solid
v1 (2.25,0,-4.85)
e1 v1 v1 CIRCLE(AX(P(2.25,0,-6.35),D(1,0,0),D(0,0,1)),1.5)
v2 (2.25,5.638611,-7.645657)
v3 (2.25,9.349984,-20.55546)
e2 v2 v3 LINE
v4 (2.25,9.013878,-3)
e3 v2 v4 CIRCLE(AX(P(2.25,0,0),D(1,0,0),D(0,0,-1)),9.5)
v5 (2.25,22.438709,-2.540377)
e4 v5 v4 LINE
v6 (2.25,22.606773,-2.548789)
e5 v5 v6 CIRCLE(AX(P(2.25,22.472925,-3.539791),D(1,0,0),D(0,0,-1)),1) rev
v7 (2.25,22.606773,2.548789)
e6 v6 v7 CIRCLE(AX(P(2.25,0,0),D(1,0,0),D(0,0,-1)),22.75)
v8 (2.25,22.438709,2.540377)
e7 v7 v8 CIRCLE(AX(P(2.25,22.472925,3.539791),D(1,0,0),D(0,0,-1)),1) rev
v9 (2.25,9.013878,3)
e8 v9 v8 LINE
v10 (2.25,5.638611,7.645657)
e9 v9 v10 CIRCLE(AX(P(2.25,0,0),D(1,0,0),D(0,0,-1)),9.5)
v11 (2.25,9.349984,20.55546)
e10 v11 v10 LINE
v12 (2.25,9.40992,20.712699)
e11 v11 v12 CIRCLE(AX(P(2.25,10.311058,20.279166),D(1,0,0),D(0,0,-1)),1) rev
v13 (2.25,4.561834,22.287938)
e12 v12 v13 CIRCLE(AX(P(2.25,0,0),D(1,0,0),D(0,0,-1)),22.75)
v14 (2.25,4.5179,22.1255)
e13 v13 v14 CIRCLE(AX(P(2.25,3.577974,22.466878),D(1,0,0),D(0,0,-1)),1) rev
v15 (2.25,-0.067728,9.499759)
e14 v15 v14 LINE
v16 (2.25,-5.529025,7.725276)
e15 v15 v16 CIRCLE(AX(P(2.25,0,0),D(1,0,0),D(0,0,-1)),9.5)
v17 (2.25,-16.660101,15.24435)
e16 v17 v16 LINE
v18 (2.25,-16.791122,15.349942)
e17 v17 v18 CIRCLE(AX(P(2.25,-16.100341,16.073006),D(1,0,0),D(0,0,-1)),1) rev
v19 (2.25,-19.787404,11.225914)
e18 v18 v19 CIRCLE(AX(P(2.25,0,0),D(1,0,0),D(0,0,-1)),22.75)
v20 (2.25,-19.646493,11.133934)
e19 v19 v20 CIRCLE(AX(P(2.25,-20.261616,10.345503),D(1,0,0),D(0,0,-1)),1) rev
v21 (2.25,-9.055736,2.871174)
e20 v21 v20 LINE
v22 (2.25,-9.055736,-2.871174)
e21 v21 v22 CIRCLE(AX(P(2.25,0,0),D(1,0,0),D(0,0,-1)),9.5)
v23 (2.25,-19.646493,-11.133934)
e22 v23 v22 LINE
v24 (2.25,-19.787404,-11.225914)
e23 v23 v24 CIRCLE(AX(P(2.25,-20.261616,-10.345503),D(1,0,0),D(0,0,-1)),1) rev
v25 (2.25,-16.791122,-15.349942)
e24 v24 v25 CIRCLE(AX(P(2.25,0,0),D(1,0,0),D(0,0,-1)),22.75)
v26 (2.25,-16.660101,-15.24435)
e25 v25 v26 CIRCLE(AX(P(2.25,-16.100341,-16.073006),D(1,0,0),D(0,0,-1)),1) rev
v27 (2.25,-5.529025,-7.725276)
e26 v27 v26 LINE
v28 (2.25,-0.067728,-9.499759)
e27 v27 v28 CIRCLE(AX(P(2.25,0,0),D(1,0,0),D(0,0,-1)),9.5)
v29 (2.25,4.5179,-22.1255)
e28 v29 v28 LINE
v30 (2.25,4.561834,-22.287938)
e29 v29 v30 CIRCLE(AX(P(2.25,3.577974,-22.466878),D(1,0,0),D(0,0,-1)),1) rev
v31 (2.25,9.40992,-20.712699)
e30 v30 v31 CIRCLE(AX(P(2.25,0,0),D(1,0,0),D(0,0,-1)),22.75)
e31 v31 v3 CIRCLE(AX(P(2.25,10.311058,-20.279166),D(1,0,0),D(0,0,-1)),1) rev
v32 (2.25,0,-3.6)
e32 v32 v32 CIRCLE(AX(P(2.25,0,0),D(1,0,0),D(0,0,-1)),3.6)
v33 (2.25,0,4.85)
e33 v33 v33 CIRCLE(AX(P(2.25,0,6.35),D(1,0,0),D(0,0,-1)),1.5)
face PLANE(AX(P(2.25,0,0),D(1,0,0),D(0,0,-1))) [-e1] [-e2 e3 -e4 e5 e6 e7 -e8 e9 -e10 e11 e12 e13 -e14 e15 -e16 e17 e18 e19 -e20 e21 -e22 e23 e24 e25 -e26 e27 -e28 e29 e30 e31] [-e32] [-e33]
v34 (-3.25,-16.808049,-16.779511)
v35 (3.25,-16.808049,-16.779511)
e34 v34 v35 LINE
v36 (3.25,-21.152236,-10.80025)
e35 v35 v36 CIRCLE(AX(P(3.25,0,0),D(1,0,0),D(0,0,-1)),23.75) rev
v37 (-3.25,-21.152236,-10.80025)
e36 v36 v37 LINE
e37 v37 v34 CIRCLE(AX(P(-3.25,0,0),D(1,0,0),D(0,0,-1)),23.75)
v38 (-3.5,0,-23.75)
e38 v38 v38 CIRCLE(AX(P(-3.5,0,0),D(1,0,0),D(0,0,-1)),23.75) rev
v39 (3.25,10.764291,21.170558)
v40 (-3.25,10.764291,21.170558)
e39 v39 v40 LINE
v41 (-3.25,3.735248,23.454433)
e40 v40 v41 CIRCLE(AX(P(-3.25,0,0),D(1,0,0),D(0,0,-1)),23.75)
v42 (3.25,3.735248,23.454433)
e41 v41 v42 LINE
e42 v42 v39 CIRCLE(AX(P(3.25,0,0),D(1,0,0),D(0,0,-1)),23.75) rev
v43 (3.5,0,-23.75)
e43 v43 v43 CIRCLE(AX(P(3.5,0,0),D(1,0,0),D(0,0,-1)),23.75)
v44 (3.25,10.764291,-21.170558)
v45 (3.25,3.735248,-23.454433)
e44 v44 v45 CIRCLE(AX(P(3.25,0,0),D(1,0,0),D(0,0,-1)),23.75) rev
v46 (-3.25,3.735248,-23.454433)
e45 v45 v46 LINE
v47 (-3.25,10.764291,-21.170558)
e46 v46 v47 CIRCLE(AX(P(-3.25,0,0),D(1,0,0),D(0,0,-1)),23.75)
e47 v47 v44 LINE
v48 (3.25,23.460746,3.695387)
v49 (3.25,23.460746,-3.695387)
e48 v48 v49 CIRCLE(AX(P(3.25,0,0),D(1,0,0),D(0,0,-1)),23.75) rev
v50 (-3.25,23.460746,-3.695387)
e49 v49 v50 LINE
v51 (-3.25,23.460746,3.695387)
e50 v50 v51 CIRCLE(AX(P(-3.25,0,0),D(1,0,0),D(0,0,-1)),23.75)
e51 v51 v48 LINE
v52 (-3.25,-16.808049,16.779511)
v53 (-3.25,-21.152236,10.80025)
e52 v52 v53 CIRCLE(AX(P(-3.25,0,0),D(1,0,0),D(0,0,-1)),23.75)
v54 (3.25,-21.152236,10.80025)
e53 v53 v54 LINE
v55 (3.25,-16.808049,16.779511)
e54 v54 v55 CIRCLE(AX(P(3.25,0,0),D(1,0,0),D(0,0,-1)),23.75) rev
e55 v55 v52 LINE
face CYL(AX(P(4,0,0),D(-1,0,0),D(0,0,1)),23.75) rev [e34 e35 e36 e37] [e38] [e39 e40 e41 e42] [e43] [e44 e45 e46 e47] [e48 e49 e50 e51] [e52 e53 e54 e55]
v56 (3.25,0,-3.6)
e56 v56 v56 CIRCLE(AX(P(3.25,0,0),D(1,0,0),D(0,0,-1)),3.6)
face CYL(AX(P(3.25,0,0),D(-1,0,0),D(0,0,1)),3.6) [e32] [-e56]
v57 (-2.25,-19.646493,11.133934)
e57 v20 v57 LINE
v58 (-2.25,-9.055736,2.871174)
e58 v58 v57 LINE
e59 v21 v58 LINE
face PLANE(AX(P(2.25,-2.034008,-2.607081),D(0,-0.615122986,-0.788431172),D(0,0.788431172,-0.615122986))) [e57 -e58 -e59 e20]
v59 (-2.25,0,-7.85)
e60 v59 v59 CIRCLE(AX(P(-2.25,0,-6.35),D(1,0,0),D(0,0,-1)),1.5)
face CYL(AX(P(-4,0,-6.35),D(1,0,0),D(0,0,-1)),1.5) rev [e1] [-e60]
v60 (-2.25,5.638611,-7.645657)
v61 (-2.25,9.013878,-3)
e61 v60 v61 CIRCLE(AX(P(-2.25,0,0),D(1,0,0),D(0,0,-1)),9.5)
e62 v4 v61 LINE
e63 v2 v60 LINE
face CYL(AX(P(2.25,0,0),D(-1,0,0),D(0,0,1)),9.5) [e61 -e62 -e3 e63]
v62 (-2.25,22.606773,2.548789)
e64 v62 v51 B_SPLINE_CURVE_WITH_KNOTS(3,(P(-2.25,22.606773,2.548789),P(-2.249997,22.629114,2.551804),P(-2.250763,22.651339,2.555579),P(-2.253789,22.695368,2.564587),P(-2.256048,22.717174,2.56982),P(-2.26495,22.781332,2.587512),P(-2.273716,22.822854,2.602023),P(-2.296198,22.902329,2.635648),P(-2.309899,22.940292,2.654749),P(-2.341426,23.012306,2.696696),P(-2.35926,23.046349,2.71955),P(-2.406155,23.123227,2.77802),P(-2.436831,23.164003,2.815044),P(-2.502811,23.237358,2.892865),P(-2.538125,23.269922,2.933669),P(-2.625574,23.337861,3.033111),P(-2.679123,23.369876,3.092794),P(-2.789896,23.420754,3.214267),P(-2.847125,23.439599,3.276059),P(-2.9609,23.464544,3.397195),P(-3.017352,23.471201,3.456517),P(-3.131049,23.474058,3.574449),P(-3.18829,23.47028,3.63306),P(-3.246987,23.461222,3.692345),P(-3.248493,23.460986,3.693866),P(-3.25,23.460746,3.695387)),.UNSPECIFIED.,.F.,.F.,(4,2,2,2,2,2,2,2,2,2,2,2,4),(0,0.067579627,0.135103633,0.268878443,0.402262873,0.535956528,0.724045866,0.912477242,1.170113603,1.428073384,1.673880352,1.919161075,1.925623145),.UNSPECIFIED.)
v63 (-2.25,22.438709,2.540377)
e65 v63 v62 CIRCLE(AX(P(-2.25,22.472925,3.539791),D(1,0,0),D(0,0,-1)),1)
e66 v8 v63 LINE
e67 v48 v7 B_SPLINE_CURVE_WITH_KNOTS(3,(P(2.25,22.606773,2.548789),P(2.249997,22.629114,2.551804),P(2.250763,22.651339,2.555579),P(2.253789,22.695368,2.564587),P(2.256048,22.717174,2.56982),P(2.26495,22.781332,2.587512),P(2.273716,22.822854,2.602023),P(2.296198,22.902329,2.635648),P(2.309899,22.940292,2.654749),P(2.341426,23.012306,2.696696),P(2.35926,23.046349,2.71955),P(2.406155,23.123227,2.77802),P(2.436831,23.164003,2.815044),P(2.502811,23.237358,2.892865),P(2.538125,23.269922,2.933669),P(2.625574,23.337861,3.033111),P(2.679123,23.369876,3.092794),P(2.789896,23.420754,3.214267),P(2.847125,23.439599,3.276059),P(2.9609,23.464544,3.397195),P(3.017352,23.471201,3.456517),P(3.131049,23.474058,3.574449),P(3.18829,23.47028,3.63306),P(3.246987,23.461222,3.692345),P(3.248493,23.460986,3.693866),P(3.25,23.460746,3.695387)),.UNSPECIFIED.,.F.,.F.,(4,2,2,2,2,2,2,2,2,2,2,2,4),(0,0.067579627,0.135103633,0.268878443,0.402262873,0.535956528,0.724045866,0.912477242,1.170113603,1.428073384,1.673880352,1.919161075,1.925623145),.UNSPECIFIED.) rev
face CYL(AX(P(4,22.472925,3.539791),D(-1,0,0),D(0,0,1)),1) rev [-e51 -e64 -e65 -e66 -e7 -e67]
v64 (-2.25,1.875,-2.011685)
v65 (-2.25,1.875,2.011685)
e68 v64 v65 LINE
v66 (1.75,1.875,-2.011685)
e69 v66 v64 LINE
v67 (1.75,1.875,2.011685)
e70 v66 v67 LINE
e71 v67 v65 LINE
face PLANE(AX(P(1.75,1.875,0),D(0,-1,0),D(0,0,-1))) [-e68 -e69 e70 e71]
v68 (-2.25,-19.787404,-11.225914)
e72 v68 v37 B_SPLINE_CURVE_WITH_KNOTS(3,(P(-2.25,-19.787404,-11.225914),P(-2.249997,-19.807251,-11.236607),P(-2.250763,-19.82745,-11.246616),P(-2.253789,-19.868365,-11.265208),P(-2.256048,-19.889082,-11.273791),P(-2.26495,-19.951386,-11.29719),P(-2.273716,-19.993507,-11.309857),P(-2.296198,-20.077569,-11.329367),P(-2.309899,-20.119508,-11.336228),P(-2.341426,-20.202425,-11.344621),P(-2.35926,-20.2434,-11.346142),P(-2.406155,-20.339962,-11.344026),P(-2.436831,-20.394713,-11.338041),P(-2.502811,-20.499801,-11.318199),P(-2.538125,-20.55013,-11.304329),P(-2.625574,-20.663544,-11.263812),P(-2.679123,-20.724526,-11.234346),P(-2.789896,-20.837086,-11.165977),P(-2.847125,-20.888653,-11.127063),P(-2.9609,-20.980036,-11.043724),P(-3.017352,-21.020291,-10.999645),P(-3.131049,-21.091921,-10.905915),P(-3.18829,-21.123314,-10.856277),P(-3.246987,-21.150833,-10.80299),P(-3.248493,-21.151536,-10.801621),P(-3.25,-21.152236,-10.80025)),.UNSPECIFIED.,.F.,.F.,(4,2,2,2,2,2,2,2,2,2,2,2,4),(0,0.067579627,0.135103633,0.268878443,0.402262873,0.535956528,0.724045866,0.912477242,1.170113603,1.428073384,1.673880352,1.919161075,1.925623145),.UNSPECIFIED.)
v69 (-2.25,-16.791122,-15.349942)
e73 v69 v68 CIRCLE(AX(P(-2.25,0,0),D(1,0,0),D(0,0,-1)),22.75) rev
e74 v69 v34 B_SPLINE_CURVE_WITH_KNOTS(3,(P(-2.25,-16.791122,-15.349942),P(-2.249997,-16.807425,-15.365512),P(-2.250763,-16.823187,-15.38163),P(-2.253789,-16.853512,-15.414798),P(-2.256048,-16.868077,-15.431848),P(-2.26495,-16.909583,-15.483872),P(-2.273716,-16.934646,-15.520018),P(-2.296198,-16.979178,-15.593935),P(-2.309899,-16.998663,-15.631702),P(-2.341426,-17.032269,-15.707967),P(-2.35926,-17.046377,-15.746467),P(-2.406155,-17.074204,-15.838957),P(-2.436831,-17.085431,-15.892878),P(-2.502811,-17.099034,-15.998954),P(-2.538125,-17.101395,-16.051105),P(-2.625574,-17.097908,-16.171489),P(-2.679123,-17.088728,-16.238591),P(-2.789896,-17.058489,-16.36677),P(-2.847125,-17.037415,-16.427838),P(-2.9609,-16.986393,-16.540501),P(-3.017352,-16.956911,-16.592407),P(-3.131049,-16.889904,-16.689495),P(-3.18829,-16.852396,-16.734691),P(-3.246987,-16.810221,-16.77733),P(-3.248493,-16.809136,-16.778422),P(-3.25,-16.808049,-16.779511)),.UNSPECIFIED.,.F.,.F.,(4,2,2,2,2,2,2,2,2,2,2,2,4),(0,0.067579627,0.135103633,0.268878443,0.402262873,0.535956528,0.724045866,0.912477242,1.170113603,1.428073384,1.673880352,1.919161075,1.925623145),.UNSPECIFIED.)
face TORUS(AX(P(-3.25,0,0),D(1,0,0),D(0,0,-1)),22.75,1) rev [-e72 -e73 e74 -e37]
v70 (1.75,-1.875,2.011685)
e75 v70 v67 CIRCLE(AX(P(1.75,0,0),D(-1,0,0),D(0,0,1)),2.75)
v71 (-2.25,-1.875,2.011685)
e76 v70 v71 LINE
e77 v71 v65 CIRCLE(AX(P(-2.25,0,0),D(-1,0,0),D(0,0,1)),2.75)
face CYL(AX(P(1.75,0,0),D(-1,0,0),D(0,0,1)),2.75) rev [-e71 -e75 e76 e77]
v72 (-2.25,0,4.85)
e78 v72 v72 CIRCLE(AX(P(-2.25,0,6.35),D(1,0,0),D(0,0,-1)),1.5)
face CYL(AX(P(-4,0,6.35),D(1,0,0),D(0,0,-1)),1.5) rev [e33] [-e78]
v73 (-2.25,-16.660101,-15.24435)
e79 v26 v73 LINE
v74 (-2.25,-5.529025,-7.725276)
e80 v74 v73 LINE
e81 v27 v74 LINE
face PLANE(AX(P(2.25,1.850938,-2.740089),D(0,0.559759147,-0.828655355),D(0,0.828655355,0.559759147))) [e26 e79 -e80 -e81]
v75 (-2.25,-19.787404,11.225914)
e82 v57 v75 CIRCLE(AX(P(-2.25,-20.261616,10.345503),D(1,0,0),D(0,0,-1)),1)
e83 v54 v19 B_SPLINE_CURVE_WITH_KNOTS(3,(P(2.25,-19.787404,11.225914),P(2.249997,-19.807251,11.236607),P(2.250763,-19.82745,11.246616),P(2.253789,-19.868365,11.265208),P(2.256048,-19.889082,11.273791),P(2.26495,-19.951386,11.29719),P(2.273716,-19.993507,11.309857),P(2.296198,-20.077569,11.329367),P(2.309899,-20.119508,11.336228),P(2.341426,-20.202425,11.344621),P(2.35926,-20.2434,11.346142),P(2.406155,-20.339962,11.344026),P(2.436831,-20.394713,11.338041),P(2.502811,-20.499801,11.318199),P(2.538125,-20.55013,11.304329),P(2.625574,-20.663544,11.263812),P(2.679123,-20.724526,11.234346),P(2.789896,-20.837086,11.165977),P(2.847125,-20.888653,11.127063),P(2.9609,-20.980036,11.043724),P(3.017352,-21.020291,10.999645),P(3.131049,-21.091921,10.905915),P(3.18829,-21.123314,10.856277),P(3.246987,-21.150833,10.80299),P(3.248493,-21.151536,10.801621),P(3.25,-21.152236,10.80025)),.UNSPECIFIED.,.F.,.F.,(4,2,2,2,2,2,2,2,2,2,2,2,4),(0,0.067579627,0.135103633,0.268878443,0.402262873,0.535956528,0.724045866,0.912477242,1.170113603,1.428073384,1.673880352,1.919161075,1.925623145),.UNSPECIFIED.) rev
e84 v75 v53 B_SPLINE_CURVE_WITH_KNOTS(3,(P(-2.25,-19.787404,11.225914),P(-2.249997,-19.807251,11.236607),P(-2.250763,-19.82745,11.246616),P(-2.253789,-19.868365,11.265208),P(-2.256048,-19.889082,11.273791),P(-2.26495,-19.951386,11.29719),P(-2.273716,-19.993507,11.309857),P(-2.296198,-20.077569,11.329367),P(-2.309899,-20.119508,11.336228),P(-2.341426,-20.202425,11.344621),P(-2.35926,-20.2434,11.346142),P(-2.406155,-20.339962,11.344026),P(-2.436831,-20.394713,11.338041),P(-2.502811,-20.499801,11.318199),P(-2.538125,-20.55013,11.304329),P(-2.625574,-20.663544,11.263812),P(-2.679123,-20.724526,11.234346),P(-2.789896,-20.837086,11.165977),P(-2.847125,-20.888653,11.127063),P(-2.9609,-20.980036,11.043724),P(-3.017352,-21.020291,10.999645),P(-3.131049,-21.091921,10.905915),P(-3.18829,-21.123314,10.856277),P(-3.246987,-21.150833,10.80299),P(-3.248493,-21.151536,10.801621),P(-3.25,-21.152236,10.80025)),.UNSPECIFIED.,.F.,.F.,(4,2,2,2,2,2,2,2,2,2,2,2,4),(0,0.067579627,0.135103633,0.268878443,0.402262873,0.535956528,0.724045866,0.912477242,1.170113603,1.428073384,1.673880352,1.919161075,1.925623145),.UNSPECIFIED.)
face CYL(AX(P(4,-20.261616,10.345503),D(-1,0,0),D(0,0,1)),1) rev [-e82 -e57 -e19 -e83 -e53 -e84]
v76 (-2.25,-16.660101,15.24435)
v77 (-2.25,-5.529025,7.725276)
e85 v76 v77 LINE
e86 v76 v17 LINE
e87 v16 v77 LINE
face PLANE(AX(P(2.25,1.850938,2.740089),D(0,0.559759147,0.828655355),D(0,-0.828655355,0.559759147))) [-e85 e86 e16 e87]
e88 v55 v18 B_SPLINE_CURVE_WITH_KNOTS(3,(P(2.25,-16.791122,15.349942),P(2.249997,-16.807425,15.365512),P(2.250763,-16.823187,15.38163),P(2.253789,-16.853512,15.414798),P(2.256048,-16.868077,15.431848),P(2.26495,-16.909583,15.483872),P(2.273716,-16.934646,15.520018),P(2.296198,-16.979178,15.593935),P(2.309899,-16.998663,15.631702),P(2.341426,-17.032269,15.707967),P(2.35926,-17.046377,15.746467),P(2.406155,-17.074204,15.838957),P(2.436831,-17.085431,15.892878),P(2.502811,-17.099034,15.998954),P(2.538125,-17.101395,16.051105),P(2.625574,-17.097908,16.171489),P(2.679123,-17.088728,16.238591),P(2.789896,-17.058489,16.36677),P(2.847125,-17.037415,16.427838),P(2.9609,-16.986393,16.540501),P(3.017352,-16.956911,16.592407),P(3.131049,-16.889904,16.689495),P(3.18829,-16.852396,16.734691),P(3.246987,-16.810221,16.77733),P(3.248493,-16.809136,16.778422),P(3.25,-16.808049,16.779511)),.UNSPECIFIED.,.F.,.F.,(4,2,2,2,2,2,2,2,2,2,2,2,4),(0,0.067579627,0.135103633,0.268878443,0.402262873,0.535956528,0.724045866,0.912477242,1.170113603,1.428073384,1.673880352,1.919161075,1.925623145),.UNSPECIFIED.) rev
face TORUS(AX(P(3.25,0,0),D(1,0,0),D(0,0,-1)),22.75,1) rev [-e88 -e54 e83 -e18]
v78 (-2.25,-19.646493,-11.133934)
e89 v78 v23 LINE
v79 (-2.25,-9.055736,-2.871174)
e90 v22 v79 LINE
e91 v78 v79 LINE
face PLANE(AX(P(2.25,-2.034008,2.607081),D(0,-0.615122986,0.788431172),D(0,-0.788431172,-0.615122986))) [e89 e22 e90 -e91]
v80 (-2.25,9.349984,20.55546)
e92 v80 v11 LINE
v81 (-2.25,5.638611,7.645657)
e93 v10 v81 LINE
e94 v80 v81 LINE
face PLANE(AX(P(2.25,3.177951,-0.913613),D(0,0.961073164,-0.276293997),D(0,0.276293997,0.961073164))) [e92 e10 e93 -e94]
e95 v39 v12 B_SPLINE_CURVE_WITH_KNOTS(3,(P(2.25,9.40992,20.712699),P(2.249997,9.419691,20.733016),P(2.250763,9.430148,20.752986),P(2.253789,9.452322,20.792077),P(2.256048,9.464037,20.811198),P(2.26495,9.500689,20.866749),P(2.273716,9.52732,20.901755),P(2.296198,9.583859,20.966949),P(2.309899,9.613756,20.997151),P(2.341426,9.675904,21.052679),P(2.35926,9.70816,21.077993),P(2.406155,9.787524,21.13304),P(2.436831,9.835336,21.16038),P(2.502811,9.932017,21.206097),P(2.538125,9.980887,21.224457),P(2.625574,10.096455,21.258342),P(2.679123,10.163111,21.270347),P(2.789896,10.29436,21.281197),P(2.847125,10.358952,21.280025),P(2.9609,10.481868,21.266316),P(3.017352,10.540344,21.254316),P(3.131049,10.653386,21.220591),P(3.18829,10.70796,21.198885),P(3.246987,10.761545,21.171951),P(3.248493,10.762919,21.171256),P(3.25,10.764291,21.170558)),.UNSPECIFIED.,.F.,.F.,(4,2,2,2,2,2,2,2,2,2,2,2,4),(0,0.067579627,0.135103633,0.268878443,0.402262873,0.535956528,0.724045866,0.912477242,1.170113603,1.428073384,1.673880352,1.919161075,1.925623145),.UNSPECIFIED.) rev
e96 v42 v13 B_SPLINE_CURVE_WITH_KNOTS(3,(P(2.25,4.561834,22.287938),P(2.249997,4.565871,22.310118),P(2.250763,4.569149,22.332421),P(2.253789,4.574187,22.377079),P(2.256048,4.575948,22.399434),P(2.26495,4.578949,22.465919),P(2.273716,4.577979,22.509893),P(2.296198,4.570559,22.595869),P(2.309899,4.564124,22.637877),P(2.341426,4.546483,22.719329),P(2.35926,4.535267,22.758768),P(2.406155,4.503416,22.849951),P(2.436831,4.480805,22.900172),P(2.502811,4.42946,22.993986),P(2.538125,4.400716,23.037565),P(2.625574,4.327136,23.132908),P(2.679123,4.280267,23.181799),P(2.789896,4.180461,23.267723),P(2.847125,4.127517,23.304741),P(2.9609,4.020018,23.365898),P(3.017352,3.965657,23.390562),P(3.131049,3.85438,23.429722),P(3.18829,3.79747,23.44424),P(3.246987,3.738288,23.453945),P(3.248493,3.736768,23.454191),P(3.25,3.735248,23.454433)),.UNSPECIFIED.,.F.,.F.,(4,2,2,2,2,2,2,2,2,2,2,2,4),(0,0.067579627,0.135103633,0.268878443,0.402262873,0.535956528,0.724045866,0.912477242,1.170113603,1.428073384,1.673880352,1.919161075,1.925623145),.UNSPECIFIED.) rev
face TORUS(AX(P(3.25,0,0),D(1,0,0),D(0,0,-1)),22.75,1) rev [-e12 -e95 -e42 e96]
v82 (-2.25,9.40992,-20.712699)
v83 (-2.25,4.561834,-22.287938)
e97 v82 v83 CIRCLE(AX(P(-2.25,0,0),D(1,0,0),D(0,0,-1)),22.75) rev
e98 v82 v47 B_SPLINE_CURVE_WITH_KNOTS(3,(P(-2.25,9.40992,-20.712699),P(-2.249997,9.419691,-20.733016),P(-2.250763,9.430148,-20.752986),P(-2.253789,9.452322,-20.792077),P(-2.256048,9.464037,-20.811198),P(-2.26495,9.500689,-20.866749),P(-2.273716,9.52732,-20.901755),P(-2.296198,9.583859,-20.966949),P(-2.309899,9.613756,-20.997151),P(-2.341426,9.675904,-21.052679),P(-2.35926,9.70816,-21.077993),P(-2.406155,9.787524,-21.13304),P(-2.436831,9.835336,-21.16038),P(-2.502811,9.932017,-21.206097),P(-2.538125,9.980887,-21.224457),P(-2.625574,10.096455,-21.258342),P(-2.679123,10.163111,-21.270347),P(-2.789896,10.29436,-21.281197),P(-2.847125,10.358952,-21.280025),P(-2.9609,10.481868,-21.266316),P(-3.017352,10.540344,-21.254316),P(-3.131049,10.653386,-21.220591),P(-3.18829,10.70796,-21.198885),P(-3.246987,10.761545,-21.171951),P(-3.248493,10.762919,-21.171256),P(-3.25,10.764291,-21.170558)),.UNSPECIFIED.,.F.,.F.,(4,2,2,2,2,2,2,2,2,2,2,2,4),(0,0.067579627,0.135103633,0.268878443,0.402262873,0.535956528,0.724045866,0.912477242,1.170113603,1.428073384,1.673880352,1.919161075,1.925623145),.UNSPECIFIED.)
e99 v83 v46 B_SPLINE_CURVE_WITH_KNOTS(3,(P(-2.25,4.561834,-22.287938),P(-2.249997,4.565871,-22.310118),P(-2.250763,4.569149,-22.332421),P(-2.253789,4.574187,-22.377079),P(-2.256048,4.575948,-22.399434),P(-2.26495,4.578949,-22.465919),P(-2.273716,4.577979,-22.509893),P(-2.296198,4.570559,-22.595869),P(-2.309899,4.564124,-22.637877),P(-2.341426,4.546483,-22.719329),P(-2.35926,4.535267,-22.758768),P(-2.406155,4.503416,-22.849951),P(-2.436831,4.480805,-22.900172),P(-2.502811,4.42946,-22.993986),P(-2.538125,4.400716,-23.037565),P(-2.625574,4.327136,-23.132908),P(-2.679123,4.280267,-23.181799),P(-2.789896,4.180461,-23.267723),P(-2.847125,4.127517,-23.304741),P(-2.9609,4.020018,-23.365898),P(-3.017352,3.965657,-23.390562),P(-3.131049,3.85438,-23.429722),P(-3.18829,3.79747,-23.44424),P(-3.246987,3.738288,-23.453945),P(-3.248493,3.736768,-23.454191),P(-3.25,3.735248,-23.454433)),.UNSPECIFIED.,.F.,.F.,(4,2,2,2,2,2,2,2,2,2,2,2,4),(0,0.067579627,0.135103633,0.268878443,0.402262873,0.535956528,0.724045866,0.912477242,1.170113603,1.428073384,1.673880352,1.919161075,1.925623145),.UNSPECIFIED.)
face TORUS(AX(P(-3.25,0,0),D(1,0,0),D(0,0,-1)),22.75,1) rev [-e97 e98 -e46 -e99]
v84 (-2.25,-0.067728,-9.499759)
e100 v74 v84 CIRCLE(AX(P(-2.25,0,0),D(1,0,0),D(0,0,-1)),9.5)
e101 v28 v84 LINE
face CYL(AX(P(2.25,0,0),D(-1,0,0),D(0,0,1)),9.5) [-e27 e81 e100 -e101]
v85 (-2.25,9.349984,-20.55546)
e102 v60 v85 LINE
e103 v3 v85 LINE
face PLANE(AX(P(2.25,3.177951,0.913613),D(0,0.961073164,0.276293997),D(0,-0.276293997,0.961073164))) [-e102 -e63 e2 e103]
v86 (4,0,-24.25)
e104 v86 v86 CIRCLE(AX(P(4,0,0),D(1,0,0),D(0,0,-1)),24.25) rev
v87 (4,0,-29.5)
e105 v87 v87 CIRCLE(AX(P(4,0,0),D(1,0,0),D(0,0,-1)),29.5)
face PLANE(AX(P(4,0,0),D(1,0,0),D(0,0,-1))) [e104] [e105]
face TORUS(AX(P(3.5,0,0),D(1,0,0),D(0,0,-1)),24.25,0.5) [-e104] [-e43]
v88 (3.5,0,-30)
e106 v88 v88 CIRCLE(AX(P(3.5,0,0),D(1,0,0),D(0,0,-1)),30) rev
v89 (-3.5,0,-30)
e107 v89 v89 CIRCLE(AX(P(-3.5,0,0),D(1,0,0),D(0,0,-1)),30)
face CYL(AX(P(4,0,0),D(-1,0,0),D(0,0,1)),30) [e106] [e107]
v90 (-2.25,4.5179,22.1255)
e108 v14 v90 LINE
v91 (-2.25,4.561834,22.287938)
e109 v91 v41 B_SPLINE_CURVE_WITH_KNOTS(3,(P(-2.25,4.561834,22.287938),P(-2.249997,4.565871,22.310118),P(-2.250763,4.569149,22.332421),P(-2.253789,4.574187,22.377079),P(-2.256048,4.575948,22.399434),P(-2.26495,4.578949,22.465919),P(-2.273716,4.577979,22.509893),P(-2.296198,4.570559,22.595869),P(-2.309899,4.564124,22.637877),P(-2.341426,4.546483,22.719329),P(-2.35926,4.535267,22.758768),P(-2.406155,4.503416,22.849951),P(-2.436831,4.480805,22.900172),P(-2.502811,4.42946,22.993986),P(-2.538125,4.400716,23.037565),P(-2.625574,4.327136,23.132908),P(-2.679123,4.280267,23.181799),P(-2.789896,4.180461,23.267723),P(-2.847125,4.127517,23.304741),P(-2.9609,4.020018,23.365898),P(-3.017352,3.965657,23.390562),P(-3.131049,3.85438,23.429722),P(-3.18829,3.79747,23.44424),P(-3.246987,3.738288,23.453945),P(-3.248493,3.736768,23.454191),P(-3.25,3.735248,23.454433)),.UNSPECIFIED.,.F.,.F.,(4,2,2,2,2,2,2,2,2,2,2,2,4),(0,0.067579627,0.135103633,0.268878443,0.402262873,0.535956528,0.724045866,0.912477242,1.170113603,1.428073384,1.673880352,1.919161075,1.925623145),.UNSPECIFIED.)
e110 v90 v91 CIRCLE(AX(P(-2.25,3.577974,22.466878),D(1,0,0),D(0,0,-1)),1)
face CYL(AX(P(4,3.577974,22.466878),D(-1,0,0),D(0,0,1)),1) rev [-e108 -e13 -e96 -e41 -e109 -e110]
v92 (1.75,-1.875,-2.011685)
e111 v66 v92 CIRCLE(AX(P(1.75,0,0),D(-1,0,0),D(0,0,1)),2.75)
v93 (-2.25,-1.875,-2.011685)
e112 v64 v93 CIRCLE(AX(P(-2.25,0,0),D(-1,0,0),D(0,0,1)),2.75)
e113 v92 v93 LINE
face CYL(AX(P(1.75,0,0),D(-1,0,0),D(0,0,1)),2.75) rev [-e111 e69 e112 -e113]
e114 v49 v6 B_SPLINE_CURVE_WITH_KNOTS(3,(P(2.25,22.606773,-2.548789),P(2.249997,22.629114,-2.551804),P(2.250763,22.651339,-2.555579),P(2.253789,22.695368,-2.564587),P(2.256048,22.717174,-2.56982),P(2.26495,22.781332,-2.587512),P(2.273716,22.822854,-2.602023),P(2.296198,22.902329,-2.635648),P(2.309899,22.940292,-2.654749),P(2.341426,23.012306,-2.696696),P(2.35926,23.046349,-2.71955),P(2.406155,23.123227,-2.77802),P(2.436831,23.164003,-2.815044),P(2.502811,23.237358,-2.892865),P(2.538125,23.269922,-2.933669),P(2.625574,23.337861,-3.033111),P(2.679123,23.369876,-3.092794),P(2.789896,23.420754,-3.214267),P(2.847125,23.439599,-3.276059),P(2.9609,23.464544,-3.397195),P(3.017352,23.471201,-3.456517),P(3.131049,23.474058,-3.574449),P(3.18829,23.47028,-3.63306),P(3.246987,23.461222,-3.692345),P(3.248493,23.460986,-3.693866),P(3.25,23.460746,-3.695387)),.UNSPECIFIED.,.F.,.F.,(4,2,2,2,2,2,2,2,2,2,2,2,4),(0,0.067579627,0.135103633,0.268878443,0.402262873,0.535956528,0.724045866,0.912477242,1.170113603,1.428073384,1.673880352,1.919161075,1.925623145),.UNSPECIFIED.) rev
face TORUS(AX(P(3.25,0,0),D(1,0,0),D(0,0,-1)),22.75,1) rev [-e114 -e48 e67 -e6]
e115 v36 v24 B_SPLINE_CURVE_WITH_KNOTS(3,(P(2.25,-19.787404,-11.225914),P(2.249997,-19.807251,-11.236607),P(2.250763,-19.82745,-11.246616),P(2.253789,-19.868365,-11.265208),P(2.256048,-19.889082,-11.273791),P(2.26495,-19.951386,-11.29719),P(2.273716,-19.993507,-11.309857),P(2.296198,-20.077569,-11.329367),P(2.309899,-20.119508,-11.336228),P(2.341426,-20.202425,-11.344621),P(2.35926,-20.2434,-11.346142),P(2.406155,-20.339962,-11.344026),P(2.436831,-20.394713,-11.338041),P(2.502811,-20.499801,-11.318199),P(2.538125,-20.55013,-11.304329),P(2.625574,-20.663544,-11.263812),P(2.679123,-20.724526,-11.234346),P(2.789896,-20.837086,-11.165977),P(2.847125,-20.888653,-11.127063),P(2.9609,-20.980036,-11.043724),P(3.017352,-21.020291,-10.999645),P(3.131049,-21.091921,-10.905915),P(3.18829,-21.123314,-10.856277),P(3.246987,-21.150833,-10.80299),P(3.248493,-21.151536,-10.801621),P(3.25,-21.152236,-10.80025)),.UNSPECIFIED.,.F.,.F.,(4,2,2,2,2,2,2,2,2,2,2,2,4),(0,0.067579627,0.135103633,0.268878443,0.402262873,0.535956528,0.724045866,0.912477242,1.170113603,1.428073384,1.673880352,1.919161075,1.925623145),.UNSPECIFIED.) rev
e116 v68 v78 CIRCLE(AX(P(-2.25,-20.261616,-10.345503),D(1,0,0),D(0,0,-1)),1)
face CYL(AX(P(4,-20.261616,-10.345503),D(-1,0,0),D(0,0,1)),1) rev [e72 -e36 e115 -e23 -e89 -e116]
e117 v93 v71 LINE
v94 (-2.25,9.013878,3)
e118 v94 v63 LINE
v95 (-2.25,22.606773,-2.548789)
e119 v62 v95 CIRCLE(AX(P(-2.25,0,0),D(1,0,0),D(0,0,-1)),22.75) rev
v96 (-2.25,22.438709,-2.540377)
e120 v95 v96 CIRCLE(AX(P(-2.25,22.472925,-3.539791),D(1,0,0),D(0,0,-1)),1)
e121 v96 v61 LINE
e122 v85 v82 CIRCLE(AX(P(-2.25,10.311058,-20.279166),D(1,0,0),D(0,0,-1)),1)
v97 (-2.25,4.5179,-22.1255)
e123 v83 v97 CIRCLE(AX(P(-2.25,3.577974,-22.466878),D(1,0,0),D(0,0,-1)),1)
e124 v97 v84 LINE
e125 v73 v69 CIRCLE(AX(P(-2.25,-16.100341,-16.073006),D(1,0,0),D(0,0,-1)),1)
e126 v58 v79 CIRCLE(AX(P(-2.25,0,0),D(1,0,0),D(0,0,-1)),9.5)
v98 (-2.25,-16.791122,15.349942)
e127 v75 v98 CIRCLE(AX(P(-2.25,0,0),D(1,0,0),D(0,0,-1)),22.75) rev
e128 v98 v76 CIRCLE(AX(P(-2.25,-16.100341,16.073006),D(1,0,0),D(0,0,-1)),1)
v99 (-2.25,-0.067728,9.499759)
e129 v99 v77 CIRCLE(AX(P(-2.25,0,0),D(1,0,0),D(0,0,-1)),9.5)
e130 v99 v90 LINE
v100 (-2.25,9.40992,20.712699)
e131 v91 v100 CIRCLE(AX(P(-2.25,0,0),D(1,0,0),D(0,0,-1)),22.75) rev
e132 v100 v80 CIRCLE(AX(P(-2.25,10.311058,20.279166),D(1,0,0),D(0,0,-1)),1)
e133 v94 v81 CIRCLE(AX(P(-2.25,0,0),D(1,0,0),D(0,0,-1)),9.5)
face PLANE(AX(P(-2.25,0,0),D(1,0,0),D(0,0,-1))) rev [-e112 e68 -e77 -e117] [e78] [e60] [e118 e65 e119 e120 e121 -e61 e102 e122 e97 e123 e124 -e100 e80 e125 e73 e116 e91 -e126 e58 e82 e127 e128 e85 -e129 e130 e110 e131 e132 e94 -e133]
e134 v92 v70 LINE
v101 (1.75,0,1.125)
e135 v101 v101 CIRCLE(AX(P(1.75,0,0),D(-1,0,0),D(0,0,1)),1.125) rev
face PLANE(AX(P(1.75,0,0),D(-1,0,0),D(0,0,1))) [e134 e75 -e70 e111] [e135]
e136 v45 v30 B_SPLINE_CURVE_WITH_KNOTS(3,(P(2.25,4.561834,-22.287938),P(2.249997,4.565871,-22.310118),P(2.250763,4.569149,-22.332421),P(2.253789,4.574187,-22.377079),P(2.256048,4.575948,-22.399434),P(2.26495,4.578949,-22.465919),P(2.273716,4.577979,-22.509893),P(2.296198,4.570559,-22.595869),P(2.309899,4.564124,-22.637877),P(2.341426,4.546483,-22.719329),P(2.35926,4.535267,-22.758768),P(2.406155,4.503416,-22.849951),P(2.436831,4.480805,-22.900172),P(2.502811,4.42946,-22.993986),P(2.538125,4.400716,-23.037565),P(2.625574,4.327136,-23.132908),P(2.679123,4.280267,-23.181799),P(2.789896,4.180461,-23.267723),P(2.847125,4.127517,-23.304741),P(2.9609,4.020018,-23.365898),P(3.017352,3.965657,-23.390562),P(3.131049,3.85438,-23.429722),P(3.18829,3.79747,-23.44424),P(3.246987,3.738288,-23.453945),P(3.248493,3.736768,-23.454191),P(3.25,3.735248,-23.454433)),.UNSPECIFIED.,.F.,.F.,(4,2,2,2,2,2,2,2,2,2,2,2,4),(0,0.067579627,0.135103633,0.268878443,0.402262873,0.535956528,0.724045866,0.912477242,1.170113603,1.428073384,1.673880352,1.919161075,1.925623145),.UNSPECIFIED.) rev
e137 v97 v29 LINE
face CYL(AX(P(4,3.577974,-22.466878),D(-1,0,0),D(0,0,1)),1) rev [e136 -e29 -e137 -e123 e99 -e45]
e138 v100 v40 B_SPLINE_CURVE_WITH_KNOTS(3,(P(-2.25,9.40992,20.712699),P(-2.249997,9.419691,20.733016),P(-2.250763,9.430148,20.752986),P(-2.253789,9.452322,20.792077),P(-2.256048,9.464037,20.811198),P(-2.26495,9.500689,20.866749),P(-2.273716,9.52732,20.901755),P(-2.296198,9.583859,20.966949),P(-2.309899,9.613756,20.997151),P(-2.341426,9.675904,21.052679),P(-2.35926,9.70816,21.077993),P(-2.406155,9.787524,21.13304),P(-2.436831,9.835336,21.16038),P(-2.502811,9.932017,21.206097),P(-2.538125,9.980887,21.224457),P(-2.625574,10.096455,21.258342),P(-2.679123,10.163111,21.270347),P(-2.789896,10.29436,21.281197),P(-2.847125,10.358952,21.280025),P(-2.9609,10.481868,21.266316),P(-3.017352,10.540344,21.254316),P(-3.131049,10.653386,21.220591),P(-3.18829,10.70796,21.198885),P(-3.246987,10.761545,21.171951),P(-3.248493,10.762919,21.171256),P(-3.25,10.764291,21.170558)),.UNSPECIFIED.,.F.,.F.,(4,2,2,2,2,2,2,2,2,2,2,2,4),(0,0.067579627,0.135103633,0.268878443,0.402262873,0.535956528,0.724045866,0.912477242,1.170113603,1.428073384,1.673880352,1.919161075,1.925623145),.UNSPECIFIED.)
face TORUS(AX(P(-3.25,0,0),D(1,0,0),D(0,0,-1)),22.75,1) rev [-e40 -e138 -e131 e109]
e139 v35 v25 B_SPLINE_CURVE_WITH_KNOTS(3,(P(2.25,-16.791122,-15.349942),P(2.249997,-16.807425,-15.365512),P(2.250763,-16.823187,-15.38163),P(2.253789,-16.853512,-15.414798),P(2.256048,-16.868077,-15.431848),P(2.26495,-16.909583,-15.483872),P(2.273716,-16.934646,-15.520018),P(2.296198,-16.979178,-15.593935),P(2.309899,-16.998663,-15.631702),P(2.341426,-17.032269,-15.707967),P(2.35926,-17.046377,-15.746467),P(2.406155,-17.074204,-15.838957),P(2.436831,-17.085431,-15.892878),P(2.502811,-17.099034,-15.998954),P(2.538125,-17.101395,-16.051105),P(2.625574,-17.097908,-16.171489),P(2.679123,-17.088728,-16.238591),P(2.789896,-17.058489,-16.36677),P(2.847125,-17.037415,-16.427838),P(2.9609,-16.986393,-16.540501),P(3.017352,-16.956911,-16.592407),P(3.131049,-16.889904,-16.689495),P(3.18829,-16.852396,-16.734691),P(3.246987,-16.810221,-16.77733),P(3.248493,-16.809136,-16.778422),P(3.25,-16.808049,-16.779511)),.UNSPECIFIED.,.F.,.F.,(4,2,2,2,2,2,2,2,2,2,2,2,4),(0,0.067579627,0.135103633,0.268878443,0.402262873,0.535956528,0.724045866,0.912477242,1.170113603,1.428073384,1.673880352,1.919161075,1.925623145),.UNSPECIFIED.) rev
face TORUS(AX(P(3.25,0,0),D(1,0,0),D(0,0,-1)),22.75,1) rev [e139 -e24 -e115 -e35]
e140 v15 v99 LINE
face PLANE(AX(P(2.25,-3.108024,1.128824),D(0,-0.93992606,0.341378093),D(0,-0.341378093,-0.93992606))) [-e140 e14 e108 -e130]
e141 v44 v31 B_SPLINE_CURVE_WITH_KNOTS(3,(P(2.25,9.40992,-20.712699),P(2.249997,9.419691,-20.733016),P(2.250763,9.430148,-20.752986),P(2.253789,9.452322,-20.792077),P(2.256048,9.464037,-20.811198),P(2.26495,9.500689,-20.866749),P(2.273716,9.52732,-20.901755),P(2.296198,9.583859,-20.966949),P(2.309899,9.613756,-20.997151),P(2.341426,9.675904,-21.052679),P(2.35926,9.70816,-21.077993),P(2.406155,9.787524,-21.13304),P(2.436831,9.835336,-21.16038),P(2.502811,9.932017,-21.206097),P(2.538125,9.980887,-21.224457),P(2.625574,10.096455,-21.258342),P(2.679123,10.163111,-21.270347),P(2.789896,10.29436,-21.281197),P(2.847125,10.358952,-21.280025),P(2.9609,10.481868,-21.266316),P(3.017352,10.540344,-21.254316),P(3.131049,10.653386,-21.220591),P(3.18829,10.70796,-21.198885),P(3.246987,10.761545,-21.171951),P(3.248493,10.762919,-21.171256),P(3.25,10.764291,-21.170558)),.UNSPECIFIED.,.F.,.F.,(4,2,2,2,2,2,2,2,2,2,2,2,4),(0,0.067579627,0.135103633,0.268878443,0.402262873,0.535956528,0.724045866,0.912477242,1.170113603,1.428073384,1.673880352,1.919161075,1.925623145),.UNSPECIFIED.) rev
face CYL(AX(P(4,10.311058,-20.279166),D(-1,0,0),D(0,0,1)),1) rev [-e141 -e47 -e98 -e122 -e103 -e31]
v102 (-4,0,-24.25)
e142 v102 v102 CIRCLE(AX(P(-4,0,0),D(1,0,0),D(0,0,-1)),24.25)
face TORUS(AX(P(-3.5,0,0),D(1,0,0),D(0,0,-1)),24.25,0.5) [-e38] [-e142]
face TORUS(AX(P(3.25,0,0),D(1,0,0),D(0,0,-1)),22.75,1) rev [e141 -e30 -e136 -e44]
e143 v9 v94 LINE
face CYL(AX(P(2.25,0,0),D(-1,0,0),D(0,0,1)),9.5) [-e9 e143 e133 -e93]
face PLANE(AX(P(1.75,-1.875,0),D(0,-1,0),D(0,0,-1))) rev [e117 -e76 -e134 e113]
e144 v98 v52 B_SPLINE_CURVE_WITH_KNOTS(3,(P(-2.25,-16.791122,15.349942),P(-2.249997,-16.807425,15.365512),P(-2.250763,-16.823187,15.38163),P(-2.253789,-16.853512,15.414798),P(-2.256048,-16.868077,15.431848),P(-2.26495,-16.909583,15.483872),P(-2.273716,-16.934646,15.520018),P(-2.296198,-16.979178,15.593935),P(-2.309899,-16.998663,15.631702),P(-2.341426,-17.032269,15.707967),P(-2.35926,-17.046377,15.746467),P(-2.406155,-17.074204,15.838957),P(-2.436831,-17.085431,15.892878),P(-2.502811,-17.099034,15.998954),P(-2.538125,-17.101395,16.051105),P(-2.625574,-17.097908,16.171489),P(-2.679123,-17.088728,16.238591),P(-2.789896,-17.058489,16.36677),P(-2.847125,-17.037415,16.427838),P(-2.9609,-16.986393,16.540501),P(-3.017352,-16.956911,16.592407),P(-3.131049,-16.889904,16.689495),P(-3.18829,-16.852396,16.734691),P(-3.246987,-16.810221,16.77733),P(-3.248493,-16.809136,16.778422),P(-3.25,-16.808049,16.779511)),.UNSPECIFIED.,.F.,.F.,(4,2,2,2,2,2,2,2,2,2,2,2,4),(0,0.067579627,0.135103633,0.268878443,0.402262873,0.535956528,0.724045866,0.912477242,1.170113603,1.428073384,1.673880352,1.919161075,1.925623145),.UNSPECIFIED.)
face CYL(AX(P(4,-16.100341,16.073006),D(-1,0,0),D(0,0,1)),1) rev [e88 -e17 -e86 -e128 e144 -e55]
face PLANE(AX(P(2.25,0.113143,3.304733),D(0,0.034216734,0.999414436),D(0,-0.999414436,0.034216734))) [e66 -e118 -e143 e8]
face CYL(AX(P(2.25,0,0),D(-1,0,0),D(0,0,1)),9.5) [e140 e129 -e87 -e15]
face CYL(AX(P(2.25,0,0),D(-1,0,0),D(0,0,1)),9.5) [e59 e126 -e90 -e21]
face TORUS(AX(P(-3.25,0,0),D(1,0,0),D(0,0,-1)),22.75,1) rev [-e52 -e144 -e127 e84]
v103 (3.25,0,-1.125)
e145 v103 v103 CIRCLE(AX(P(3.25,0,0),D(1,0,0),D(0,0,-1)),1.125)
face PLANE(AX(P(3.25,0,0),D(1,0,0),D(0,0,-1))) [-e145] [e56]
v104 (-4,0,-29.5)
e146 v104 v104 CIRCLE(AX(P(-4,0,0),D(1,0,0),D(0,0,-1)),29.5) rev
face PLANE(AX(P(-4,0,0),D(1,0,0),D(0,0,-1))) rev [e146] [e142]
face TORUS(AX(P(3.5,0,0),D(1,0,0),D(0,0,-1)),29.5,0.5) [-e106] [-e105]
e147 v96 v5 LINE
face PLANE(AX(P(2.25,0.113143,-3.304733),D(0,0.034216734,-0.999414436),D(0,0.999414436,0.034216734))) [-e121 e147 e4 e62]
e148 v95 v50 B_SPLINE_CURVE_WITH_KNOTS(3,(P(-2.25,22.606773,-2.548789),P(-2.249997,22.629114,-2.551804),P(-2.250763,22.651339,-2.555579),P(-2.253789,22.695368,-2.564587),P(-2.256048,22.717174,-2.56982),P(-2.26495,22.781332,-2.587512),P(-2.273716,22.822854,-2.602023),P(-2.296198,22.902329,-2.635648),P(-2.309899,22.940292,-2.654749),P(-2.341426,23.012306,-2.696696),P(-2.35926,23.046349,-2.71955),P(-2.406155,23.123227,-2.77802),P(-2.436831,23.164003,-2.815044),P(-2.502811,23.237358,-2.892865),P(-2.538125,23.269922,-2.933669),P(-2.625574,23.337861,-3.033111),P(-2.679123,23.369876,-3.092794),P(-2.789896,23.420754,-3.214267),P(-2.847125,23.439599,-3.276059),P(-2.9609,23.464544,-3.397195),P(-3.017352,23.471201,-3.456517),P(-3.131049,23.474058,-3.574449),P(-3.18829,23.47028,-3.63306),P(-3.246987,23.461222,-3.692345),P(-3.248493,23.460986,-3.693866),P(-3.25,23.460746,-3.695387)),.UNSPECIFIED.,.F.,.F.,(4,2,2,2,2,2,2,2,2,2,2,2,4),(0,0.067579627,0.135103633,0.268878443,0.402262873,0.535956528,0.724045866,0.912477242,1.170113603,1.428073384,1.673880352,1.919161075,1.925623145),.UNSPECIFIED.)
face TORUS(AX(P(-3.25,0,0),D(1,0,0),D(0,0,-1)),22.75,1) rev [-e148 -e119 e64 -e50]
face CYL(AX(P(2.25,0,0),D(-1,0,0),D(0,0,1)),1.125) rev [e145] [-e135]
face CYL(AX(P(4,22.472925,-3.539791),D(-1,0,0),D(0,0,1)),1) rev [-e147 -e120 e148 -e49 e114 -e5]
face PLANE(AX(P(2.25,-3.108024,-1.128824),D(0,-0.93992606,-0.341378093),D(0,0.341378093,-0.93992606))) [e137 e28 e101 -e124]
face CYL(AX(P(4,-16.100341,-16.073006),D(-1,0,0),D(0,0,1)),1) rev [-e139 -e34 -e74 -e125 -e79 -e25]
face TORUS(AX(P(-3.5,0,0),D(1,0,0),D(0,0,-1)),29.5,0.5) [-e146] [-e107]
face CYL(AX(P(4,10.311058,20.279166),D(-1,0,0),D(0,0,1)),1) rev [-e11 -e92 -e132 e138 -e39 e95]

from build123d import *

# Parameters (mm, degrees)
SKETCH1_R           = 30
SKETCH1_R_2         = 23.75
BOSS_EXTRUDE1_DEPTH = 4
SKETCH3_R           = 9.5
SKETCH3_R_2         = 1.125
BOSS_EXTRUDE2_DEPTH = 2.25
FILLET1_R           = 1
CIRPATTERN1_START   = -3.2500001
CIRPATTERN1_DEPTH   = 6.5000002
SKETCH4_R           = 3.6
SKETCH4_R_2         = 1.125
BOSS_EXTRUDE3_DEPTH = 1
SKETCH5_R           = 1.5
CUT_EXTRUDE1_DEPTH  = 43.884291996
CIRPATTERN2_COUNT   = 2
SKETCH6_R           = 1.125
CUT_EXTRUDE2_DEPTH  = 4
FILLET2_R           = 0.5


with BuildPart() as part:
    # Sketch1 → Boss-Extrude1 (new, symmetric)
    with BuildSketch(Plane(origin=(0, 0, 0), x_dir=(0, 0, -1), z_dir=(1, 0, 0))):
        Circle(SKETCH1_R)
        Circle(SKETCH1_R_2, mode=Mode.SUBTRACT)
    extrude(amount=BOSS_EXTRUDE1_DEPTH, both=True)

    # Sketch3 → Boss-Extrude2 (add, symmetric)
    # profile 1 of 2: a face of its own
    with BuildSketch(Plane(origin=(0, 0, 0), x_dir=(0, 0, -1), z_dir=(1, 0, 0))):
        Circle(SKETCH3_R)
        Circle(SKETCH3_R_2, mode=Mode.SUBTRACT)
    # profile 2 of 2: a face of its own
    with BuildSketch(Plane(origin=(0, 0, 0), x_dir=(0, 0, -1), z_dir=(1, 0, 0))):
        with BuildLine():
            Line((-2.5, 23.618054535), (-3, 9.013878189))
            ThreePointArc((-3, 9.013878189), (0, 9.5), (3, 9.013878189))
            Line((3, 9.013878189), (2.5, 23.618054535))
            ThreePointArc((2.5, 23.618054535), (0, 23.75), (-2.5, 23.618054535))
        make_face()
    extrude(amount=BOSS_EXTRUDE2_DEPTH, both=True)

    # Fillet1
    # the kernel refuses this fillet: 1 mm, written as the material it adds along each edge
    with BuildSketch(Plane(origin=(2.25, 0, 0), x_dir=(0, 0.9778800585979858, -0.2091664193803582), z_dir=(0, -0.2091664193803582, -0.9778800585979858))) as fillet1_piece_1_section:
        with BuildLine():
            CenterArc((23.75 - FILLET1_R, FILLET1_R), FILLET1_R, 270, 90)
            Line((23.75 - FILLET1_R, 0), (23.75, 0))
            Line((23.75, 0), (23.75, FILLET1_R))
        make_face()
    fillet1_piece_1 = revolve(axis=Axis((2.25, 0, 0), (1, 0, 0)), revolution_arc=24.147013547, mode=Mode.PRIVATE)
    fillet1_piece_1 = split(fillet1_piece_1, bisect_by=Plane(origin=(2.25, 0.113143406, -3.304732515), z_dir=(0, -0.03421673405052404, 0.9994144361129249)), keep=Keep.TOP, mode=Mode.PRIVATE)
    fillet1_piece_1 = split(fillet1_piece_1, bisect_by=Plane(origin=(2.25, 0.113143406, 3.304732515), z_dir=(0, -0.03421673405052404, -0.9994144361129249)), keep=Keep.TOP, mode=Mode.PRIVATE)
    add(fillet1_piece_1)
    with BuildSketch(Plane(origin=(2.25, 23.618054535, -2.5), x_dir=(0, -0.13047123096448623, -0.9914520956105806), z_dir=(-1, 0, 0)), Plane(origin=(-2.25, 23.618054535, 2.5), x_dir=(0, -0.13047123096448424, 0.9914520956105807), z_dir=(1, 0, 0))) as fillet1_piece_2:
        with BuildLine():
            CenterArc((1.180309811, 0.9996778), FILLET1_R, 170.542319009, 100.912176362)
            Line((0.193902574, 1.163996884), (0, 0))
            ThreePointArc((0, 0), (0.602846409, -0.00765226), (1.205692818, 0))
        make_face()
    extrude(amount=4.5)
    with BuildSketch(Plane(origin=(-2.25, 0, 0), x_dir=(0, 0.9778800585979858, -0.2091664193803582), z_dir=(0, -0.2091664193803582, -0.9778800585979858))) as fillet1_piece_3_section:
        with BuildLine():
            CenterArc((23.75 - FILLET1_R, -FILLET1_R), FILLET1_R, 0, 90)
            Line((23.75 - FILLET1_R, 0), (23.75, 0))
            Line((23.75, 0), (23.75, -FILLET1_R))
        make_face()
    fillet1_piece_3 = revolve(axis=Axis((-2.25, 0, 0), (1, 0, 0)), revolution_arc=24.147013547, mode=Mode.PRIVATE)
    fillet1_piece_3 = split(fillet1_piece_3, bisect_by=Plane(origin=(-2.25, 0.113143406, 3.304732515), z_dir=(0, -0.03421673405052404, -0.9994144361129249)), keep=Keep.TOP, mode=Mode.PRIVATE)
    fillet1_piece_3 = split(fillet1_piece_3, bisect_by=Plane(origin=(-2.25, 0.113143406, -3.304732515), z_dir=(0, -0.03421673405052404, 0.9994144361129249)), keep=Keep.TOP, mode=Mode.PRIVATE)
    add(fillet1_piece_3)
    with BuildSketch(Plane(origin=(2.25, 0, 0), x_dir=(0, 0.9778800585979858, -0.2091664193803582), z_dir=(0, -0.2091664193803582, -0.9778800585979858))) as fillet1_piece_4a_section:
        with BuildLine():
            CenterArc((23.75 - FILLET1_R, FILLET1_R), FILLET1_R, 270, 90)
            Line((23.75 - FILLET1_R, 0), (23.75, 0))
            Line((23.75, 0), (23.75, FILLET1_R))
        make_face()
    fillet1_piece_4a = revolve(axis=Axis((2.25, 0, 0), (1, 0, 0)), revolution_arc=24.147013547, mode=Mode.PRIVATE)
    fillet1_piece_4a = split(fillet1_piece_4a, bisect_by=Plane(origin=(2.25, 0.113143406, -3.304732515), z_dir=(0, 0.03421673405052404, -0.9994144361129249)), keep=Keep.TOP, mode=Mode.PRIVATE)
    with BuildSketch(Plane(origin=(5.264232045, 23.618054535, -2.5), x_dir=(0, -0.13047123096448623, -0.9914520956105806), z_dir=(-1, 0, 0))) as fillet1_piece_4b_section:
        with BuildLine():
            CenterArc((1.180309811, 0.9996778), FILLET1_R, 170.542319009, 100.912176362)
            Line((0.193902574, 1.163996884), (0, 0))
            ThreePointArc((0, 0), (0.602846409, -0.00765226), (1.205692818, 0))
        make_face()
    fillet1_piece_4b = extrude(amount=7.514232045, mode=Mode.PRIVATE)
    fillet1_piece_4b = split(fillet1_piece_4b, bisect_by=Plane(origin=(4, 23.618054535, -2.5), z_dir=(-1, 0, 0)), keep=Keep.TOP, mode=Mode.PRIVATE)
    fillet1_piece_4b = split(fillet1_piece_4b, bisect_by=Plane(origin=(2.25, 23.618054535, -2.5), z_dir=(1, 0, 0)), keep=Keep.TOP, mode=Mode.PRIVATE)
    fillet1_piece_4 = fillet1_piece_4a & fillet1_piece_4b
    add(fillet1_piece_4)
    with BuildSketch(Plane(origin=(2.25, 0, 0), x_dir=(0, 0.9778800585979858, -0.2091664193803582), z_dir=(0, -0.2091664193803582, -0.9778800585979858))) as fillet1_piece_5a_section:
        with BuildLine():
            CenterArc((23.75 - FILLET1_R, FILLET1_R), FILLET1_R, 270, 90)
            Line((23.75 - FILLET1_R, 0), (23.75, 0))
            Line((23.75, 0), (23.75, FILLET1_R))
        make_face()
    fillet1_piece_5a = revolve(axis=Axis((2.25, 0, 0), (1, 0, 0)), revolution_arc=24.147013547, mode=Mode.PRIVATE)
    fillet1_piece_5a = split(fillet1_piece_5a, bisect_by=Plane(origin=(2.25, 0.113143406, 3.304732515), z_dir=(0, 0.03421673405052404, 0.9994144361129249)), keep=Keep.TOP, mode=Mode.PRIVATE)
    with BuildSketch(Plane(origin=(-2.25, 23.618054535, 2.5), x_dir=(0, -0.13047123096448424, 0.9914520956105807), z_dir=(1, 0, 0))) as fillet1_piece_5b_section:
        with BuildLine():
            CenterArc((1.180309811, 0.9996778), FILLET1_R, 170.542319009, 100.912176362)
            Line((0.193902574, 1.163996884), (0, 0))
            ThreePointArc((0, 0), (0.602846409, -0.00765226), (1.205692818, 0))
        make_face()
    fillet1_piece_5b = extrude(amount=7.514232045, mode=Mode.PRIVATE)
    fillet1_piece_5b = split(fillet1_piece_5b, bisect_by=Plane(origin=(4, 23.618054535, 2.5), z_dir=(-1, 0, 0)), keep=Keep.TOP, mode=Mode.PRIVATE)
    fillet1_piece_5b = split(fillet1_piece_5b, bisect_by=Plane(origin=(2.25, 23.618054535, 2.5), z_dir=(1, 0, 0)), keep=Keep.TOP, mode=Mode.PRIVATE)
    fillet1_piece_5 = fillet1_piece_5a & fillet1_piece_5b
    add(fillet1_piece_5)
    with BuildSketch(Plane(origin=(-2.25, 0, 0), x_dir=(0, 0.9778800585979858, -0.2091664193803582), z_dir=(0, -0.2091664193803582, -0.9778800585979858))) as fillet1_piece_6a_section:
        with BuildLine():
            CenterArc((23.75 - FILLET1_R, -FILLET1_R), FILLET1_R, 0, 90)
            Line((23.75 - FILLET1_R, 0), (23.75, 0))
            Line((23.75, 0), (23.75, -FILLET1_R))
        make_face()
    fillet1_piece_6a = revolve(axis=Axis((-2.25, 0, 0), (1, 0, 0)), revolution_arc=24.147013547, mode=Mode.PRIVATE)
    fillet1_piece_6a = split(fillet1_piece_6a, bisect_by=Plane(origin=(-2.25, 0.113143406, -3.304732515), z_dir=(0, 0.03421673405052404, -0.9994144361129249)), keep=Keep.TOP, mode=Mode.PRIVATE)
    with BuildSketch(Plane(origin=(2.25, 23.618054535, -2.5), x_dir=(0, -0.13047123096448623, -0.9914520956105806), z_dir=(-1, 0, 0))) as fillet1_piece_6b_section:
        with BuildLine():
            CenterArc((1.180309811, 0.9996778), FILLET1_R, 170.542319009, 100.912176362)
            Line((0.193902574, 1.163996884), (0, 0))
            ThreePointArc((0, 0), (0.602846409, -0.00765226), (1.205692818, 0))
        make_face()
    fillet1_piece_6b = extrude(amount=7.514232045, mode=Mode.PRIVATE)
    fillet1_piece_6b = split(fillet1_piece_6b, bisect_by=Plane(origin=(-4, 23.618054535, -2.5), z_dir=(1, 0, 0)), keep=Keep.TOP, mode=Mode.PRIVATE)
    fillet1_piece_6b = split(fillet1_piece_6b, bisect_by=Plane(origin=(-2.25, 23.618054535, -2.5), z_dir=(-1, 0, 0)), keep=Keep.TOP, mode=Mode.PRIVATE)
    fillet1_piece_6 = fillet1_piece_6a & fillet1_piece_6b
    add(fillet1_piece_6)
    with BuildSketch(Plane(origin=(-5.264232045, 23.618054535, 2.5), x_dir=(0, -0.13047123096448424, 0.9914520956105807), z_dir=(1, 0, 0))) as fillet1_piece_7a_section:
        with BuildLine():
            CenterArc((1.180309811, 0.9996778), FILLET1_R, 170.542319009, 100.912176362)
            Line((0.193902574, 1.163996884), (0, 0))
            ThreePointArc((0, 0), (0.602846409, -0.00765226), (1.205692818, 0))
        make_face()
    fillet1_piece_7a = extrude(amount=7.514232045, mode=Mode.PRIVATE)
    fillet1_piece_7a = split(fillet1_piece_7a, bisect_by=Plane(origin=(-4, 23.618054535, 2.5), z_dir=(1, 0, 0)), keep=Keep.TOP, mode=Mode.PRIVATE)
    fillet1_piece_7a = split(fillet1_piece_7a, bisect_by=Plane(origin=(-2.25, 23.618054535, 2.5), z_dir=(-1, 0, 0)), keep=Keep.TOP, mode=Mode.PRIVATE)
    with BuildSketch(Plane(origin=(-2.25, 0, 0), x_dir=(0, 0.9778800585979858, -0.2091664193803582), z_dir=(0, -0.2091664193803582, -0.9778800585979858))) as fillet1_piece_7b_section:
        with BuildLine():
            CenterArc((23.75 - FILLET1_R, -FILLET1_R), FILLET1_R, 0, 90)
            Line((23.75 - FILLET1_R, 0), (23.75, 0))
            Line((23.75, 0), (23.75, -FILLET1_R))
        make_face()
    fillet1_piece_7b = revolve(axis=Axis((-2.25, 0, 0), (1, 0, 0)), revolution_arc=24.147013547, mode=Mode.PRIVATE)
    fillet1_piece_7b = split(fillet1_piece_7b, bisect_by=Plane(origin=(-2.25, 0.113143406, 3.304732515), z_dir=(0, 0.03421673405052404, 0.9994144361129249)), keep=Keep.TOP, mode=Mode.PRIVATE)
    fillet1_piece_7 = fillet1_piece_7a & fillet1_piece_7b
    add(fillet1_piece_7)

    # CirPattern1: read off the stored shape, not the designer's step
    # CirPattern1 outline → CirPattern1 (add)
    with BuildSketch(Plane.YZ.offset(CIRPATTERN1_START)):
        with BuildLine():
            ThreePointArc((-16.808048677, -16.779511306), (-17.095729582, -15.977076963), (-16.660100512, -15.244350212))
            Line((-16.660100512, -15.244350212), (-5.529024883, -7.725275648))
            ThreePointArc((-5.529024883, -7.725275648), (-7.685661447, -5.583959897), (-9.055736397, -2.871173682))
            Line((-9.055736397, -2.871173682), (-19.646492792, -11.13393387))
            ThreePointArc((-19.646492792, -11.13393387), (-20.477974129, -11.321816718), (-21.152236251, -10.80025007))
            ThreePointArc((-21.152236251, -10.80025007), (-19.214153616, -13.959899742), (-16.808048677, -16.779511306))
        make_face()
        with BuildLine():
            ThreePointArc((5.638611094, -7.645656606), (2.935661447, -9.035036905), (-0.067728003, -9.499758572))
            Line((-0.067728003, -9.499758572), (4.517900207, -22.125499772))
            ThreePointArc((4.517900207, -22.125499772), (4.43964555, -22.974344509), (3.735247736, -23.454432936))
            ThreePointArc((3.735247736, -23.454432936), (7.339153616, -22.587592262), (10.764290884, -21.170558372))
            ThreePointArc((10.764290884, -21.170558372), (9.912232184, -21.196193321), (9.349984419, -20.555460437))
            Line((9.349984419, -20.555460437), (5.638611094, -7.645656606))
        make_face()
        with BuildLine():
            Line((-19.646492792, 11.13393387), (-9.055736397, 2.871173682))
            ThreePointArc((-9.055736397, 2.871173682), (-7.685661447, 5.583959897), (-5.529024883, 7.725275648))
            Line((-5.529024883, 7.725275648), (-16.660100512, 15.244350212))
            ThreePointArc((-16.660100512, 15.244350212), (-17.095729582, 15.977076963), (-16.808048677, 16.779511306))
            ThreePointArc((-16.808048677, 16.779511306), (-19.214153616, 13.959899742), (-21.152236251, 10.80025007))
            ThreePointArc((-21.152236251, 10.80025007), (-20.477974129, 11.321816718), (-19.646492792, 11.13393387))
        make_face()
        with BuildLine():
            Line((4.517900207, 22.125499772), (-0.067728003, 9.499758572))
            ThreePointArc((-0.067728003, 9.499758572), (2.935661447, 9.035036905), (5.638611094, 7.645656606))
            Line((5.638611094, 7.645656606), (9.349984419, 20.555460437))
            ThreePointArc((9.349984419, 20.555460437), (9.912232184, 21.196193321), (10.764290884, 21.170558372))
            ThreePointArc((10.764290884, 21.170558372), (7.339153616, 22.587592262), (3.735247736, 23.454432936))
            ThreePointArc((3.735247736, 23.454432936), (4.43964555, 22.974344509), (4.517900207, 22.125499772))
        make_face()
    extrude(amount=CIRPATTERN1_DEPTH)

    # CirPattern1 2 outline → CirPattern1 2 (revolve, cut)
    with BuildSketch(Plane.YX):
        with BuildLine():
            Line((9.5, 3.2500001), (9.5, 2.25))
            Line((9.5, 2.25), (22.75, 2.25))
            ThreePointArc((22.75, 2.25), (23.457106781, 2.542893219), (23.75, 3.25))
            Line((23.75, 3.25), (9.5, 3.2500001))
        make_face()
        with BuildLine():
            Line((22.75, -2.25), (9.5, -2.25))
            Line((9.5, -2.25), (9.5, -3.2500001))
            Line((9.5, -3.2500001), (23.75, -3.25))
            ThreePointArc((23.75, -3.25), (23.457106781, -2.542893219), (22.75, -2.25))
        make_face()
    revolve(axis=Axis((0, 0, 0), (1, 0, 0)), mode=Mode.SUBTRACT)

    # Sketch4 → Boss-Extrude3 (add)
    with BuildSketch(Plane(origin=(2.25, 0, 0), x_dir=(0, 0, -1), z_dir=(1, 0, 0))):
        Circle(SKETCH4_R)
        Circle(SKETCH4_R_2, mode=Mode.SUBTRACT)
    extrude(amount=BOSS_EXTRUDE3_DEPTH)

    # Sketch5 → Cut-Extrude1 (cut, through all)
    with BuildSketch(Plane(origin=(2.25, 0, 0), x_dir=(0, 0, -1), z_dir=(1, 0, 0))):
        with Locations((-6.35, 0)):
            Circle(SKETCH5_R)
    cut_extrude1 = extrude(amount=-CUT_EXTRUDE1_DEPTH, mode=Mode.SUBTRACT)

    # CirPattern2: Cut-Extrude1 ×2 about axis
    cirpattern2_axis = Axis((0, 0, 0), (1, 0, 0))
    for i in range(1, CIRPATTERN2_COUNT):
        add(cut_extrude1.rotate(cirpattern2_axis, i * 360 / CIRPATTERN2_COUNT), mode=Mode.SUBTRACT)

    # Sketch6 → Cut-Extrude2 (cut)
    with BuildSketch(Plane.ZY.offset(2.25)):
        with BuildLine():
            Line((2.011684617, 1.875), (-2.011684617, 1.875))
            ThreePointArc((-2.011684617, 1.875), (-2.75, 0), (-2.011684617, -1.875))
            Line((-2.011684617, -1.875), (2.011684617, -1.875))
            ThreePointArc((2.011684617, -1.875), (2.55877243, -1.007563224), (2.75, 0))
            ThreePointArc((2.75, 0), (2.55877243, 1.007563224), (2.011684617, 1.875))
        make_face()
        Circle(SKETCH6_R, mode=Mode.SUBTRACT)
    extrude(amount=-CUT_EXTRUDE2_DEPTH, mode=Mode.SUBTRACT)

    # Fillet2
    fillet2_edges = [part.edges().sort_by_distance(p)[0] for p in [
        (-4, 0, 30),
        (4, 0, 30),
        (-4, 0, 23.75),
        (4, 0, 23.75),
    ]]
    fillet(fillet2_edges, radius=FILLET2_R)


solid = part.part
